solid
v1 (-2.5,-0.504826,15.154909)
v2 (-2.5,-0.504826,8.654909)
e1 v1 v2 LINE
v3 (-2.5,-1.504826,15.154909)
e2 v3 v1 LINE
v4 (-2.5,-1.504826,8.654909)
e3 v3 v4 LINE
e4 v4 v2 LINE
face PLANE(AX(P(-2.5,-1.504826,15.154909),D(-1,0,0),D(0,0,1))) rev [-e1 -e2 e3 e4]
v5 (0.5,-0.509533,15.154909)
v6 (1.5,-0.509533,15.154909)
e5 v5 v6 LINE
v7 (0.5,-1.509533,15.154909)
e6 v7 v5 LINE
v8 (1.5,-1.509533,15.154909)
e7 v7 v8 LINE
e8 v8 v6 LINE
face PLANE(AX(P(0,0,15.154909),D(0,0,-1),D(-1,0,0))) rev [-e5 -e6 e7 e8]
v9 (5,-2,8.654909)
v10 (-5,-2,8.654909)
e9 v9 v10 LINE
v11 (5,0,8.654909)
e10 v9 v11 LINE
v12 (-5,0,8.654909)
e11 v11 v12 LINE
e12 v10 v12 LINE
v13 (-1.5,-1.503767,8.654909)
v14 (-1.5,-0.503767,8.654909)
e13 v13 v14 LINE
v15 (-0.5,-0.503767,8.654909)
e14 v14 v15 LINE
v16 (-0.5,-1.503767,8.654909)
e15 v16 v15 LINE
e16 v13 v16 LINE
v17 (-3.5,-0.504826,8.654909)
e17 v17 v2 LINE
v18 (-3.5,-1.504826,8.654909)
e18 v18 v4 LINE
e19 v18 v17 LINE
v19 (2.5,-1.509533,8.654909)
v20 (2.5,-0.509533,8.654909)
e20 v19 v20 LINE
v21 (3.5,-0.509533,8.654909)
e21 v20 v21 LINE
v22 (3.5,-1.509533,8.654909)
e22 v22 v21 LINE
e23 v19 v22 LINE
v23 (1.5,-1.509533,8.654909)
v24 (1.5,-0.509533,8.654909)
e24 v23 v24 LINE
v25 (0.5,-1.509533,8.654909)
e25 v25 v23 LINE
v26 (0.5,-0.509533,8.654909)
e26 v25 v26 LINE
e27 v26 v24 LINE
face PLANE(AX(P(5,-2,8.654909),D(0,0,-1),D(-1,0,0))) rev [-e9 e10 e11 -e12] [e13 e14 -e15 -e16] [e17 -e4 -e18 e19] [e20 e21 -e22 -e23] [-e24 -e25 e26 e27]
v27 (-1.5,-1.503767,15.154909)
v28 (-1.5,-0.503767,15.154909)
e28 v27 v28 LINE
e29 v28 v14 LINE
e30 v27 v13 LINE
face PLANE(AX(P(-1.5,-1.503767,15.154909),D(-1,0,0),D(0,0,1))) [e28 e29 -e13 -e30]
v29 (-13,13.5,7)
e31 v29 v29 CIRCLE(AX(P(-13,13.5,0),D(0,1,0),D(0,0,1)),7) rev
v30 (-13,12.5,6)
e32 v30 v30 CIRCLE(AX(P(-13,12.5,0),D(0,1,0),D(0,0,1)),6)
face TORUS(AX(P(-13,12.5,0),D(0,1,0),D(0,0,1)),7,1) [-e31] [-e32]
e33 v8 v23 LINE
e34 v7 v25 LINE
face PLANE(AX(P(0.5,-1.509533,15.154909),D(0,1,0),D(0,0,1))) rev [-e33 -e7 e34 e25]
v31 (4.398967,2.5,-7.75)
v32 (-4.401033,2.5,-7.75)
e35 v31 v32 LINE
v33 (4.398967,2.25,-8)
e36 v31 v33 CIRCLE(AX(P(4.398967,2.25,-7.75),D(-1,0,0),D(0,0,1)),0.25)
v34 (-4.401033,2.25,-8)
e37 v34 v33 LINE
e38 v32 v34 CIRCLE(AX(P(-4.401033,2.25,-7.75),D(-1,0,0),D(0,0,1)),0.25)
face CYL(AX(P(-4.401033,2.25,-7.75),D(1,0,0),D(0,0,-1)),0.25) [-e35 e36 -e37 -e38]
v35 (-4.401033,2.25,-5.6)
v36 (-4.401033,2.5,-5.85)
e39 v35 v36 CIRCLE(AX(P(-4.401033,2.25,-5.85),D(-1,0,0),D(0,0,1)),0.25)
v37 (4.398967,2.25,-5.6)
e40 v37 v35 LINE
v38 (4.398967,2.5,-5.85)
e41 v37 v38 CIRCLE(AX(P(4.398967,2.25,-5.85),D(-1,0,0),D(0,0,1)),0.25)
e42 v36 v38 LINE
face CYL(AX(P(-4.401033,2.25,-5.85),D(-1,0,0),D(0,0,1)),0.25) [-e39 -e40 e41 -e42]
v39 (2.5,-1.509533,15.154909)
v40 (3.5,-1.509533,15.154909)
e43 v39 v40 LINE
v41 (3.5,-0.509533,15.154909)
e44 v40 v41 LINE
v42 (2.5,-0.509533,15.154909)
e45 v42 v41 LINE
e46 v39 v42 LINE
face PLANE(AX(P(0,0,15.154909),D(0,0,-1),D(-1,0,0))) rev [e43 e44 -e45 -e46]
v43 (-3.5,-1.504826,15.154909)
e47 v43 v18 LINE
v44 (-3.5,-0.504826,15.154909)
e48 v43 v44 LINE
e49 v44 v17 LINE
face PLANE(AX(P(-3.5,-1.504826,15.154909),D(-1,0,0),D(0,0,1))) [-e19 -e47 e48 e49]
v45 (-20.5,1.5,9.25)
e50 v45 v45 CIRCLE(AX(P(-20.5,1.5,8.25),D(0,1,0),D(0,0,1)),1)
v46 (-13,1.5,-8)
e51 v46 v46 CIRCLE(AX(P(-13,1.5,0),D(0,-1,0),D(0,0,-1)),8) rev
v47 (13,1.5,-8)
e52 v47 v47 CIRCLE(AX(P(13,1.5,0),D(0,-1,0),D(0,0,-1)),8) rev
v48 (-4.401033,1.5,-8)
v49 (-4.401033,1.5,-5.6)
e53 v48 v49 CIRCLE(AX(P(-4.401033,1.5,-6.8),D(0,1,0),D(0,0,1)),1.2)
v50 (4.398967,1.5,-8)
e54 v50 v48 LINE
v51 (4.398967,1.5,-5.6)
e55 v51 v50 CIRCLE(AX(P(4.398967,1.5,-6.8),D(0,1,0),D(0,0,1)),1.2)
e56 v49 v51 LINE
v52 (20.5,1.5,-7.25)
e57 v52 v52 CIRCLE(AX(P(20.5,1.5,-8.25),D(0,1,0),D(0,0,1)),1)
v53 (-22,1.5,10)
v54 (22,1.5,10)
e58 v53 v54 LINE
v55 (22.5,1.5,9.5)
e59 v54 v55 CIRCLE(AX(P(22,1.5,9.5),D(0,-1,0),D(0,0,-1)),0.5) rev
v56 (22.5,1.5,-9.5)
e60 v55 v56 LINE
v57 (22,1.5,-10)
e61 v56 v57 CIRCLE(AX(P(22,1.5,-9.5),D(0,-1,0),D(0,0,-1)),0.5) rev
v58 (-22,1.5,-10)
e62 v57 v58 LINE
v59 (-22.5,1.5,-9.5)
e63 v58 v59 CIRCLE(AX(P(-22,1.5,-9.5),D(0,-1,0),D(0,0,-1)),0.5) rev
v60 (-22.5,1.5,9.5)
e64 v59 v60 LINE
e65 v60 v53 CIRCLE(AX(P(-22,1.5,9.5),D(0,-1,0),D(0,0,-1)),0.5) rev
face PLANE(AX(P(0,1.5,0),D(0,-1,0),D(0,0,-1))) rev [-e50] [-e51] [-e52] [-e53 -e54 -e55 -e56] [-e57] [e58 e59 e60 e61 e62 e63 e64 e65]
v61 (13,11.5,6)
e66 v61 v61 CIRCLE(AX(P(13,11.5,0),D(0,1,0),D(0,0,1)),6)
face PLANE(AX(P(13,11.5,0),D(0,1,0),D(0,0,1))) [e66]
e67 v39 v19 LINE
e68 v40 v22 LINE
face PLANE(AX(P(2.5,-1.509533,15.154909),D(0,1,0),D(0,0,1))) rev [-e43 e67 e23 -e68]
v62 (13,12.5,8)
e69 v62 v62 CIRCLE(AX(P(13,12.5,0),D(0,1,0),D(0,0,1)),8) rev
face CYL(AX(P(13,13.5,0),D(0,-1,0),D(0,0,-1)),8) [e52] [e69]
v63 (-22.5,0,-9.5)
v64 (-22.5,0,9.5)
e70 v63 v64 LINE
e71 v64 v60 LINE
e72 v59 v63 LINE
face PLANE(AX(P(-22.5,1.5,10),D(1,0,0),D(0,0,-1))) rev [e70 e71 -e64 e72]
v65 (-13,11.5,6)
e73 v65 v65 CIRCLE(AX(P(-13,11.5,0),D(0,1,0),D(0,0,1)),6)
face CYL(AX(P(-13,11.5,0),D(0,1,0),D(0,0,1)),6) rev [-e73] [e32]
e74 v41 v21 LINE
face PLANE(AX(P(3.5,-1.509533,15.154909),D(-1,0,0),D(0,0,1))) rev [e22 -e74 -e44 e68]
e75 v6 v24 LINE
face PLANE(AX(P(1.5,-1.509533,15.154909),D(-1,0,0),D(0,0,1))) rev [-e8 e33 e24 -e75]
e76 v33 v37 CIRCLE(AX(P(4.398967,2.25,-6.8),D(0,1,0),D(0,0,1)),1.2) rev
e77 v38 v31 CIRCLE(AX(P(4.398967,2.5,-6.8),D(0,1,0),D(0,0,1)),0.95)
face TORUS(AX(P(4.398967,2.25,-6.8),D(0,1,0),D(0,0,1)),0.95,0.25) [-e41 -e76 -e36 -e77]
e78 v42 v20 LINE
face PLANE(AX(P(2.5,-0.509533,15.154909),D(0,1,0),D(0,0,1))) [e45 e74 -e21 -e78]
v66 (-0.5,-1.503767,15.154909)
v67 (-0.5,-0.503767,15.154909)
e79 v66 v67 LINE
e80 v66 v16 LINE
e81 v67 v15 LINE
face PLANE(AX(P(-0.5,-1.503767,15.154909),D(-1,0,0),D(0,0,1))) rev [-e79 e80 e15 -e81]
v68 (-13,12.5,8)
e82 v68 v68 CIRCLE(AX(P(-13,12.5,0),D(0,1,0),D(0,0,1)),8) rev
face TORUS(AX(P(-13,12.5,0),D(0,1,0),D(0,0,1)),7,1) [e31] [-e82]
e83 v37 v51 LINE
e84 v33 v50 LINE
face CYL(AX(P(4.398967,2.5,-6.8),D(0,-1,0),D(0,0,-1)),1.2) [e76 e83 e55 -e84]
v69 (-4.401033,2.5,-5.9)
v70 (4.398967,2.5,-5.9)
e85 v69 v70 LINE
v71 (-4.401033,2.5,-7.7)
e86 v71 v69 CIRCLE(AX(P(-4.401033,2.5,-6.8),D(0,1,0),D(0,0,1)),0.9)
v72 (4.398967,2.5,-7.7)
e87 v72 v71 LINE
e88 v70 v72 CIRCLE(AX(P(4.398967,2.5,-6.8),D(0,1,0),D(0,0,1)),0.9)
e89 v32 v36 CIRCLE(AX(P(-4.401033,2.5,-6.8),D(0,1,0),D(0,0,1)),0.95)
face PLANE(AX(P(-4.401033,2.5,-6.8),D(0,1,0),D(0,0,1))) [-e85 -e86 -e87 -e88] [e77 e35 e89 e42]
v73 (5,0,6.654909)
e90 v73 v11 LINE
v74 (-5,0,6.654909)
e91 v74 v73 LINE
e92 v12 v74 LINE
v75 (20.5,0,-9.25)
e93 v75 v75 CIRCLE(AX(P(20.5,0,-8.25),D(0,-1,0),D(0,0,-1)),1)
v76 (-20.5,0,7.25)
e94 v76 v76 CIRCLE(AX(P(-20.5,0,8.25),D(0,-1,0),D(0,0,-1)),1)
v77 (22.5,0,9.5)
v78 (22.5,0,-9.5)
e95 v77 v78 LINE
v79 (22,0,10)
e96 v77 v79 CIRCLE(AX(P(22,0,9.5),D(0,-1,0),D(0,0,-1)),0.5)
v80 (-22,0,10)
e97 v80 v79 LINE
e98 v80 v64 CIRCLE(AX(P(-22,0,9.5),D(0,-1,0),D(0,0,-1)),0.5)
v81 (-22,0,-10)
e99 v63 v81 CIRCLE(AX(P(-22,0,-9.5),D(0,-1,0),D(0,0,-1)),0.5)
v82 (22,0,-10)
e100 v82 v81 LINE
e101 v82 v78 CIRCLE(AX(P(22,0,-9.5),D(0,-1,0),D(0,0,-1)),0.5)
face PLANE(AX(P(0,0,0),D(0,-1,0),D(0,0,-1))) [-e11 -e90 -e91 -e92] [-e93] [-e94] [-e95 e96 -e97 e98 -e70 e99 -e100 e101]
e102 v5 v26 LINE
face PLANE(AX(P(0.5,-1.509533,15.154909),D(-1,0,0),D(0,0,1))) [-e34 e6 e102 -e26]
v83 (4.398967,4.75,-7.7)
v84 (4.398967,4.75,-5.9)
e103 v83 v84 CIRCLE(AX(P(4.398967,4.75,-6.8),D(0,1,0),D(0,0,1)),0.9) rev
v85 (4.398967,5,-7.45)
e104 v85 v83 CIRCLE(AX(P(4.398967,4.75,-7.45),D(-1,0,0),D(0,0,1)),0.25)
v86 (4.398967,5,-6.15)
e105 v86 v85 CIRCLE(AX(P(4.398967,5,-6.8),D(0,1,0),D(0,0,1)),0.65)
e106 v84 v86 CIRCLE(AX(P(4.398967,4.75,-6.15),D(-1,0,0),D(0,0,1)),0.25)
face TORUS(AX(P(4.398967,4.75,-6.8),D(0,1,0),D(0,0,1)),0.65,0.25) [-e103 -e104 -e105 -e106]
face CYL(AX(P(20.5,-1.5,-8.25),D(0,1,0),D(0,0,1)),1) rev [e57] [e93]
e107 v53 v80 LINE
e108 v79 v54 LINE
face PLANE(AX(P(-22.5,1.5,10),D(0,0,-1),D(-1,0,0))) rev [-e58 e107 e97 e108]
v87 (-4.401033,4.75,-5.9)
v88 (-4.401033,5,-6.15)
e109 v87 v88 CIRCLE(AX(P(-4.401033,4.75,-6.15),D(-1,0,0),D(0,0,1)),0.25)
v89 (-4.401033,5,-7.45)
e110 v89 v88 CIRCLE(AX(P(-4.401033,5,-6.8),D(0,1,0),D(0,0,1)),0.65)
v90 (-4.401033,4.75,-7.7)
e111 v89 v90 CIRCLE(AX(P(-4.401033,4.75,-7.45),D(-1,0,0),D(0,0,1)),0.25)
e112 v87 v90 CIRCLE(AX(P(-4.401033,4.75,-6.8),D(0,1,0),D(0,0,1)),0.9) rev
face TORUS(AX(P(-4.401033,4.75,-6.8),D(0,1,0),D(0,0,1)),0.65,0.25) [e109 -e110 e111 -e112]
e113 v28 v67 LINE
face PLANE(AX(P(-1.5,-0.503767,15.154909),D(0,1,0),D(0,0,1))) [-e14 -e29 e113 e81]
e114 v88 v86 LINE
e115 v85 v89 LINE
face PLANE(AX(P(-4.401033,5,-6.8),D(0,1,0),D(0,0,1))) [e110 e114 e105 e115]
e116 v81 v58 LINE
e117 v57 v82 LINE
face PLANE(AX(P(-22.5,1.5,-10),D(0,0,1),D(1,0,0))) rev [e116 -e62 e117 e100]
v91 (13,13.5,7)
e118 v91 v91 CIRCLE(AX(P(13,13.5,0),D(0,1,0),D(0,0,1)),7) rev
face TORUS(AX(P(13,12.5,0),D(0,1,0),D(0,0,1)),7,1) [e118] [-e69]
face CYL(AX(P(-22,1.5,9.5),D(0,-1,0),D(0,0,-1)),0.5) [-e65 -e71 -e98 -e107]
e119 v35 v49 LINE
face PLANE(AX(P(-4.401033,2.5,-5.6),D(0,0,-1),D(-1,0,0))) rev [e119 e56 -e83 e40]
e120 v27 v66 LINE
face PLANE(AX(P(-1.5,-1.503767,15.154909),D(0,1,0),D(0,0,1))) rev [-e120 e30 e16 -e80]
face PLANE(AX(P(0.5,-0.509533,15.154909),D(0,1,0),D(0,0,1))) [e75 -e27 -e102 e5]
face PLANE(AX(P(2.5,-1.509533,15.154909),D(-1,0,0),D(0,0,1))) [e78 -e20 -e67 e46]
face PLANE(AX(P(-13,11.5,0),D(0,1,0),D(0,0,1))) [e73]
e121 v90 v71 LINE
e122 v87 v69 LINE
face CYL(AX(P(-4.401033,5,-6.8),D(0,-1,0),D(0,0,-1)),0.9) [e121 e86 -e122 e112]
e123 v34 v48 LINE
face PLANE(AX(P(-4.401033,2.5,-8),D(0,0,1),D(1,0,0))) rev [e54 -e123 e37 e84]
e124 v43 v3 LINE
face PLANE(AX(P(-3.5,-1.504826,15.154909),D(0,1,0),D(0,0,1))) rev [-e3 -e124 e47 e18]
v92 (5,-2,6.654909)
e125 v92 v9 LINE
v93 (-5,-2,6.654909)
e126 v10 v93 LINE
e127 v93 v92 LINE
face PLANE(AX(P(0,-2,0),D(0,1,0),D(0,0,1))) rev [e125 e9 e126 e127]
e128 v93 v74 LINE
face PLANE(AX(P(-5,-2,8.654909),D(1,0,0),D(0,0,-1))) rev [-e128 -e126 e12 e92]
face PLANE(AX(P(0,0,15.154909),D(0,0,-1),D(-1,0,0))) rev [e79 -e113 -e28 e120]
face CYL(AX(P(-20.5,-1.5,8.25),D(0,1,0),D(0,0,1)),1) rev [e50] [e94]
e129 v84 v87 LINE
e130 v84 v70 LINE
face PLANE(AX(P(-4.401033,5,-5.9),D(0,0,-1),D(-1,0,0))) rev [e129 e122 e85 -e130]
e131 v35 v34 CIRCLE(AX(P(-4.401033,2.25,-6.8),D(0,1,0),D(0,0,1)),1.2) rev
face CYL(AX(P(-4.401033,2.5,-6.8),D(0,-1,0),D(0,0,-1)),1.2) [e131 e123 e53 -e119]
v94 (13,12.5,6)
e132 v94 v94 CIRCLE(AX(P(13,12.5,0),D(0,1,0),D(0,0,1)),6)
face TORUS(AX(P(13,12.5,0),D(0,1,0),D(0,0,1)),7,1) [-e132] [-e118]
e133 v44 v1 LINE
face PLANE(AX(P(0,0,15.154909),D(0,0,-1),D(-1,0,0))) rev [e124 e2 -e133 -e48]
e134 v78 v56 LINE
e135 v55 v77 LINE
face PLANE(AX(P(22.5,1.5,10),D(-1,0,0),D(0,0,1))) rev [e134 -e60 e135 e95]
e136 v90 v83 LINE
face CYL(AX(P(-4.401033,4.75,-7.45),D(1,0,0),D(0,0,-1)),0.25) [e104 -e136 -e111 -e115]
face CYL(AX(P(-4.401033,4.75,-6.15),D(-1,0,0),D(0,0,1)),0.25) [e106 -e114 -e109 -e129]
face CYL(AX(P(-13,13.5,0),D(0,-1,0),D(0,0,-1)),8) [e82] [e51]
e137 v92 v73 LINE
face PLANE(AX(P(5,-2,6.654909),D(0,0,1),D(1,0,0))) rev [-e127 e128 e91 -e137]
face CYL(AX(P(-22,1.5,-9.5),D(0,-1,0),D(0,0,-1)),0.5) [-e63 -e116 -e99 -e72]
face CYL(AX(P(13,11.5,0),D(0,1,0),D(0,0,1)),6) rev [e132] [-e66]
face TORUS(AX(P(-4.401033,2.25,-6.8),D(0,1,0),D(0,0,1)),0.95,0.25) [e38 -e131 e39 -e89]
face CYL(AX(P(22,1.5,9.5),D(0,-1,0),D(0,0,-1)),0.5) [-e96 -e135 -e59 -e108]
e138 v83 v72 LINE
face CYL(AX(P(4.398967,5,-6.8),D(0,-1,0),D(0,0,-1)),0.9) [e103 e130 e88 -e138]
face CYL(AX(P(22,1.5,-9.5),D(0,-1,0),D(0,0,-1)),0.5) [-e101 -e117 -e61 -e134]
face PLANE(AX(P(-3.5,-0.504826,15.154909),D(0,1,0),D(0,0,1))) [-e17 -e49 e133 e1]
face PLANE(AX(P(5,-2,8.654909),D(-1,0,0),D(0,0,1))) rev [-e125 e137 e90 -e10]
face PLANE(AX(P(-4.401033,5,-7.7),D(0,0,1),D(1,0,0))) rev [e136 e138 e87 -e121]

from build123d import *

# Parameters (mm, degrees)
SKETCH1_W           = 45
SKETCH1_H           = 20
BOSS_EXTRUDE1_DEPTH = 1.5
SKETCH2_R           = 8
BOSS_EXTRUDE3_DEPTH = 12
SKETCH3_R           = 1
CUT_EXTRUDE1_DEPTH  = 3
SKETCH4_R           = 6
CUT_EXTRUDE2_DEPTH  = 2
SKETCH5_R           = 6
CUT_EXTRUDE3_DEPTH  = 2
FILLET1_R           = 1
FILLET2_R           = 0.5
BOSS_EXTRUDE5_DEPTH = 1
BOSS_EXTRUDE6_DEPTH = 2.5
FILLET3_R           = 0.25
SKETCH8_W           = 10
SKETCH8_H           = 2
BOSS_EXTRUDE7_DEPTH = 2
SKETCH9_W           = 1
SKETCH9_H           = 1
BOSS_EXTRUDE9_DEPTH = 6.5


with BuildPart() as part:
    # Sketch1 → Boss-Extrude1 (new body)
    with BuildSketch(Plane(origin=(0, 0, 0), x_dir=(1, 0, 0), z_dir=(0, 1, 0))):
        Rectangle(SKETCH1_W, SKETCH1_H)
    extrude(amount=BOSS_EXTRUDE1_DEPTH)

    # Sketch2 → Boss-Extrude3 (add)
    with BuildSketch(Plane(origin=(0, 1.5, 0), x_dir=(1, 0, 0), z_dir=(0, 1, 0))):
        with Locations(Location((-13, 0, 0), (0, 0, 90))):
            Circle(SKETCH2_R)
        with Locations(Location((13, 0, 0), (0, 0, 90))):
            Circle(SKETCH2_R)
    extrude(amount=BOSS_EXTRUDE3_DEPTH)

    # Sketch3 → Cut-Extrude1 (cut)
    with BuildSketch(Plane(origin=(0, 1.5, 0), x_dir=(1, 0, 0), z_dir=(0, 1, 0))):
        with Locations(Location((-20.5, -8.25, 0), (0, 0, 270))):
            Circle(SKETCH3_R)
        with Locations(Location((20.5, 8.25, 0), (0, 0, 270))):
            Circle(SKETCH3_R)
    extrude(amount=-CUT_EXTRUDE1_DEPTH, mode=Mode.SUBTRACT)

    # Sketch4 → Cut-Extrude2 (cut)
    with BuildSketch(Plane(origin=(0, 13.5, 0), x_dir=(1, 0, 0), z_dir=(0, 1, 0))):
        with Locations(Location((-13, 0, 0), (0, 0, 270))):
            Circle(SKETCH4_R)
    extrude(amount=-CUT_EXTRUDE2_DEPTH, mode=Mode.SUBTRACT)

    # Sketch5 → Cut-Extrude3 (cut)
    with BuildSketch(Plane(origin=(0, 13.5, 0), x_dir=(1, 0, 0), z_dir=(0, 1, 0))):
        with Locations(Location((13, 0, 0), (0, 0, 270))):
            Circle(SKETCH5_R)
    extrude(amount=-CUT_EXTRUDE3_DEPTH, mode=Mode.SUBTRACT)

    # Fillet1
    fillet1_edges = [part.edges().sort_by_distance(p)[0] for p in [
        (-13, 13.5, 8),
        (13, 13.5, 8),
        (-13, 13.5, -6),
        (13, 13.5, -6),
    ]]
    fillet(fillet1_edges, radius=FILLET1_R - 0.0001)  # a hair under: the kernel refuses the full size

    # Fillet2
    fillet2_edges = [part.edges().sort_by_distance(p)[0] for p in [
        (22.5, 0.75, 10),
        (-22.5, 0.75, 10),
        (-22.5, 0.75, -10),
        (22.5, 0.75, -10),
    ]]
    fillet(fillet2_edges, radius=FILLET2_R)

    # Sketch6 → Boss-Extrude5 (add)
    with BuildSketch(Plane(origin=(0, 1.5, 0), x_dir=(1, 0, 0), z_dir=(0, 1, 0))):
        with BuildLine():
            Line((-4.401032614, 8), (4.398967386, 8))
            ThreePointArc((4.398967386, 8), (5.598967386, 6.8), (4.398967386, 5.6))
            Line((4.398967386, 5.6), (-4.401032614, 5.6))
            ThreePointArc((-4.401032614, 5.6), (-5.601032614, 6.8), (-4.401032614, 8))
        make_face()
    extrude(amount=BOSS_EXTRUDE5_DEPTH)

    # Sketch7 → Boss-Extrude6 (add)
    with BuildSketch(Plane(origin=(0, 2.5, 0), x_dir=(1, 0, 0), z_dir=(0, 1, 0))):
        with BuildLine():
            Line((-4.401032614, 7.7), (4.398967386, 7.7))
            ThreePointArc((4.398967386, 7.7), (5.298967386, 6.8), (4.398967386, 5.9))
            Line((4.398967386, 5.9), (-4.401032614, 5.9))
            ThreePointArc((-4.401032614, 5.9), (-5.301032614, 6.8), (-4.401032614, 7.7))
        make_face()
    extrude(amount=BOSS_EXTRUDE6_DEPTH)

    # Fillet3
    fillet3_edges = [part.edges().sort_by_distance(p)[0] for p in [
        (-5.601032614, 2.5, -6.8),
        (-0.001032614, 2.5, -5.6),
        (5.598967386, 2.5, -6.8),
        (-0.001032614, 2.5, -8),
        (-5.301032614, 5, -6.8),
        (-0.001032614, 5, -5.9),
        (5.298967386, 5, -6.8),
        (-0.001032614, 5, -7.7),
    ]]
    fillet(fillet3_edges, radius=FILLET3_R)

    # Sketch8 → Boss-Extrude7 (add)
    with BuildSketch(Plane.XZ):
        with Locations((0, 7.654908977)):
            Rectangle(SKETCH8_W, SKETCH8_H)
    extrude(amount=BOSS_EXTRUDE7_DEPTH)

    # Sketch9 → Boss-Extrude9 (add)
    with BuildSketch(Plane.XY.offset(8.654908977)):
        with Locations((-3, -1.004826008)):
            Rectangle(SKETCH9_W, SKETCH9_H)
        with Locations((-1, -1.003766726)):
            Rectangle(SKETCH9_W, SKETCH9_H)
        with Locations((1, -1.009532884)):
            Rectangle(SKETCH9_W, SKETCH9_H)
        with Locations((3, -1.009532884)):
            Rectangle(SKETCH9_W, SKETCH9_H)
    extrude(amount=BOSS_EXTRUDE9_DEPTH)


solid = part.part
